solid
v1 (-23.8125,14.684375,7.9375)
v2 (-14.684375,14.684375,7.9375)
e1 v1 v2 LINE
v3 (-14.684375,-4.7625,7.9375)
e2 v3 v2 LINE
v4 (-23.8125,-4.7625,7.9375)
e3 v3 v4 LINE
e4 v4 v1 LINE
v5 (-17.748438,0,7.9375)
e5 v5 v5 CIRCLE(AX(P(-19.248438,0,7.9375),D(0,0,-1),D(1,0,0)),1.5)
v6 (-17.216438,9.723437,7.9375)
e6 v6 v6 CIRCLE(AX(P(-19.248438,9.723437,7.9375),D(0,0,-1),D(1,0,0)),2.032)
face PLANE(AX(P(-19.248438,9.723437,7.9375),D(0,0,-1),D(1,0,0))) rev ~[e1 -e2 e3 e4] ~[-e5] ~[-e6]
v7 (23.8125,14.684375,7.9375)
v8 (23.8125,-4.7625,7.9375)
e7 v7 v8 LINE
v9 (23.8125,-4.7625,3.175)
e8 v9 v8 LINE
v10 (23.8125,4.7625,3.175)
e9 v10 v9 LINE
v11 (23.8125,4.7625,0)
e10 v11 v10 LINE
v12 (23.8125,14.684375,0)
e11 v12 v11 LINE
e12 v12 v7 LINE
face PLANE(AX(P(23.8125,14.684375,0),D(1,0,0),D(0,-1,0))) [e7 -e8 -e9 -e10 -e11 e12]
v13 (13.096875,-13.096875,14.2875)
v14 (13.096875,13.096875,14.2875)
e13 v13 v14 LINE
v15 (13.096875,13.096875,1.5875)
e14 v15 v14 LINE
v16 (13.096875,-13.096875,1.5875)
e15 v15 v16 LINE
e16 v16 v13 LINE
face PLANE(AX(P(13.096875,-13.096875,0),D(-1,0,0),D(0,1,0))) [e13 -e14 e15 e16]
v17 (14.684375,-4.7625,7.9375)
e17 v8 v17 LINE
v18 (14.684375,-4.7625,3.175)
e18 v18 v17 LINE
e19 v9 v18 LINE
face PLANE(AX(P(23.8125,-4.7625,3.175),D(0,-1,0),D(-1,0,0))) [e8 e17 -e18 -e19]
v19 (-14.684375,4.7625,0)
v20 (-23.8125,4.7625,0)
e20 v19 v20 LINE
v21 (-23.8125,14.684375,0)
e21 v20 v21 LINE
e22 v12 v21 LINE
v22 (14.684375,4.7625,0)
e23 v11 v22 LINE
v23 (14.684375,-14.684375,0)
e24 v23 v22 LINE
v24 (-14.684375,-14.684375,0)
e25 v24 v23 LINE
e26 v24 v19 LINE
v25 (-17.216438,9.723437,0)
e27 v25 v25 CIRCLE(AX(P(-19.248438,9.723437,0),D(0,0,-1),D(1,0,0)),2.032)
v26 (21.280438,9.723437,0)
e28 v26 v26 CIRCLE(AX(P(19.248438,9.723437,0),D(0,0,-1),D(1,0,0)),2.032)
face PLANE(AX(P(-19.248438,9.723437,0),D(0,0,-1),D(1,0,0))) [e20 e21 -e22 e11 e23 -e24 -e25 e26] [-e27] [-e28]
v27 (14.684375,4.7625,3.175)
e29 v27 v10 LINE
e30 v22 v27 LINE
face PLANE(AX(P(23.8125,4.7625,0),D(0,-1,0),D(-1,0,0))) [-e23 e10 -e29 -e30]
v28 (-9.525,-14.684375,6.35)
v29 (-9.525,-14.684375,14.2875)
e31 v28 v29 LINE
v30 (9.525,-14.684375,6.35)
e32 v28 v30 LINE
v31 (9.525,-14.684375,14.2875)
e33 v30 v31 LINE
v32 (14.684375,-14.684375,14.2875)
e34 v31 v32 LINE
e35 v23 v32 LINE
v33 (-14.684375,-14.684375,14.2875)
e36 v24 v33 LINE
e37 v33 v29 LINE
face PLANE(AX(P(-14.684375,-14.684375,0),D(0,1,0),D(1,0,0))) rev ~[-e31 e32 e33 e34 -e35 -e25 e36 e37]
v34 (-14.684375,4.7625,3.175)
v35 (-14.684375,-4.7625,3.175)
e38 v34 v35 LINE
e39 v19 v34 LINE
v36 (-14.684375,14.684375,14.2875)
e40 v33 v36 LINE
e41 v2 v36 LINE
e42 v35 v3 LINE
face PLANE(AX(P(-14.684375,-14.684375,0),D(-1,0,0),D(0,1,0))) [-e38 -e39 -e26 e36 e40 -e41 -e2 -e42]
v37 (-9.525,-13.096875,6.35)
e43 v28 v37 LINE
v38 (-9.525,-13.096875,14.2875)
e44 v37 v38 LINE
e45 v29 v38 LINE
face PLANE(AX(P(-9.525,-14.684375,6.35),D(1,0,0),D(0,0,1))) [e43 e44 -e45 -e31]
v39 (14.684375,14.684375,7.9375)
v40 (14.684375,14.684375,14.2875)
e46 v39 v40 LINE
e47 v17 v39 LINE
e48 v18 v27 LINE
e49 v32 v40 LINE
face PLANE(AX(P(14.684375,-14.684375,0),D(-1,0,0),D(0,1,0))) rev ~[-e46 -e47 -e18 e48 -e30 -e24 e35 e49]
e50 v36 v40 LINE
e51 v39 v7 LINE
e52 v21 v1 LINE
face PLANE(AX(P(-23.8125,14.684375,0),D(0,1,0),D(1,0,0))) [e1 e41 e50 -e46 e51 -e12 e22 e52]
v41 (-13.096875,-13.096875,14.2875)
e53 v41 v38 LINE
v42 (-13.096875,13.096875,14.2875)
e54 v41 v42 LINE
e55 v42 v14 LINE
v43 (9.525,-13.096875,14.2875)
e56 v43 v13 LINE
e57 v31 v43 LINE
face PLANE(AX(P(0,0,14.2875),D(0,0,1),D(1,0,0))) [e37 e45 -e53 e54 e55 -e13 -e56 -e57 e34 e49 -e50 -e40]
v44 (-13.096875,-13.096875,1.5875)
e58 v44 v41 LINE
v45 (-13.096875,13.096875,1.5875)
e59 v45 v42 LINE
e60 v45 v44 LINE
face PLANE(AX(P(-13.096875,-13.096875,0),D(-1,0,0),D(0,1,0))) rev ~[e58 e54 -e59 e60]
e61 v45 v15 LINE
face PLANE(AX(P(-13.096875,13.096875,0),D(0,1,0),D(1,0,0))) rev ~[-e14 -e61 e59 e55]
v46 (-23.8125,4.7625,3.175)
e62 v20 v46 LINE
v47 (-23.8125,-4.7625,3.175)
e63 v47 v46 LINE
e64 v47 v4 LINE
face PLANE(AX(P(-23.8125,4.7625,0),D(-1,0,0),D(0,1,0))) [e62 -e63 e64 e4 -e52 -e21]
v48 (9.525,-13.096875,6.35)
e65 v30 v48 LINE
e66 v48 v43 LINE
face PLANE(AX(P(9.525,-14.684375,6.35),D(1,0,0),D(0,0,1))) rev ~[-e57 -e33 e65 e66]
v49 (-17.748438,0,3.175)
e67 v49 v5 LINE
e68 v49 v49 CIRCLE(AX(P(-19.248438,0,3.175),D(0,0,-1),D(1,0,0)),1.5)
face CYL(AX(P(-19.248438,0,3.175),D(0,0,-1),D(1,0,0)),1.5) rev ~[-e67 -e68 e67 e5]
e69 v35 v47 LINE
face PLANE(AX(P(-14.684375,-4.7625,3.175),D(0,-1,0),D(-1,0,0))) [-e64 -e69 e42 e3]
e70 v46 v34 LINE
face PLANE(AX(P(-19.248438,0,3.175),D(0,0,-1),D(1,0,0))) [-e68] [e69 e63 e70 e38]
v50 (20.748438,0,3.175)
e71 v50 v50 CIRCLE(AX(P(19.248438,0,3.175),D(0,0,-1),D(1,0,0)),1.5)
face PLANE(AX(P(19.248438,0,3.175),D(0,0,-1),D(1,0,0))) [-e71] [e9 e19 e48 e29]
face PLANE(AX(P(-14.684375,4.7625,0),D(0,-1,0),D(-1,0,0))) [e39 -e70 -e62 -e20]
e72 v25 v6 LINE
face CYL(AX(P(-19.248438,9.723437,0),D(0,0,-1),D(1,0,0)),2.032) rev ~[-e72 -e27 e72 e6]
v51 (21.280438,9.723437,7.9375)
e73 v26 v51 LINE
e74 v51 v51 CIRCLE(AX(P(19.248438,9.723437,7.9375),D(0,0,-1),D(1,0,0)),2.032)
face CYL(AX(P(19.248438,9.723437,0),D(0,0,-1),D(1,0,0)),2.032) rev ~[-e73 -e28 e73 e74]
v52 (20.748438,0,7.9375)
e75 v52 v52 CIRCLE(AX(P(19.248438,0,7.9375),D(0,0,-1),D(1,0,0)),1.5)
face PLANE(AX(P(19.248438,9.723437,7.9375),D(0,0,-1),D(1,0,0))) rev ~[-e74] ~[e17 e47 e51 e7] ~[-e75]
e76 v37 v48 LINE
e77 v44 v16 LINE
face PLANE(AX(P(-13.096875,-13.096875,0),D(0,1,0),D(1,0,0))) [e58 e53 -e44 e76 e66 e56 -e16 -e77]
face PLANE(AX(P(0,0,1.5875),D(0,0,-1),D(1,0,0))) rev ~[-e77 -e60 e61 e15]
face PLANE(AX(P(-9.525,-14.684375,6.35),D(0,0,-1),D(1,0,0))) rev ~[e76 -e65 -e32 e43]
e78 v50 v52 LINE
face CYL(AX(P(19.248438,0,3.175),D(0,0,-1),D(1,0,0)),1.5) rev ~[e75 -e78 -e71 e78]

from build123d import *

# Parameters (mm, degrees)
F0_W      = 29.36875
F0_H      = 29.36875
F0_W_2    = 26.19375
F0_H_2    = 26.19375
F1_DEPTH  = 14.2875
F2_W      = 26.19375
F2_H      = 26.19375
F3_DEPTH  = 1.5875
F7_W      = 19.05
F7_H      = 7.9375
F8_DEPTH  = 1.5875
F9_R      = 1.5
F10_DEPTH = 4.7625
F11_R     = 2.032
F12_DEPTH = 7.9375


with BuildPart() as f1:
    # F0 (on Top) → F1 (new body)
    with BuildSketch(Plane.XY):
        Rectangle(F0_W, F0_H)
        Rectangle(F0_W_2, F0_H_2, mode=Mode.SUBTRACT)
    extrude(amount=F1_DEPTH)

    # F2 (on face) → F3 (join)
    with BuildSketch(Plane(origin=(0, 0, 0), x_dir=(1, 0, 0), z_dir=(0, 0, -1))):
        Rectangle(F2_W, F2_H)
    extrude(amount=-F3_DEPTH)

    # F4: union 

    # F7 (on face) → F8 (cut, through all)
    with BuildSketch(Plane.XZ.offset(14.684375)):
        with Locations((0, 10.31875)):
            Rectangle(F7_W, F7_H)
    extrude(amount=-F8_DEPTH, mode=Mode.SUBTRACT)

    # F9 (on face) → F10 (join)
    with BuildSketch(Plane(origin=(0, 0, 3.175), x_dir=(1, 0, 0), z_dir=(0, 0, -1))):
        Polygon((23.8125, 4.7625), (19.2484375, 4.7625), (14.684375, 4.7625), (14.684375, -4.7625), (19.2484375, -4.7625), (23.8125, -4.7625), align=None)
        with Locations((19.2484375, 0)):
            Circle(F9_R, mode=Mode.SUBTRACT)
        Polygon((-19.2484375, -4.7625), (-14.684375, -4.7625), (-14.684375, 4.7625), (-19.2484375, 4.7625), (-23.8125, 4.7625), (-23.8125, -4.7625), align=None)
        with Locations((-19.2484375, 0)):
            Circle(F9_R, mode=Mode.SUBTRACT)
    extrude(amount=-F10_DEPTH)

    # F11 (on face) → F12 (join, through all)
    with BuildSketch(Plane(origin=(0, 0, 0), x_dir=(1, 0, 0), z_dir=(0, 0, -1))):
        Polygon((-23.8125, -14.684375), (-19.2484375, -14.684375), (-14.684375, -14.684375), (-14.684375, -4.7625), (-19.2484375, -4.7625), (-23.8125, -4.7625), align=None)
        with Locations((-19.2484375, -9.7234375)):
            Circle(F11_R, mode=Mode.SUBTRACT)
        Polygon((14.684375, -14.684375), (19.2484375, -14.684375), (23.8125, -14.684375), (23.8125, -4.7625), (19.2484375, -4.7625), (14.684375, -4.7625), align=None)
        with Locations((19.2484375, -9.7234375)):
            Circle(F11_R, mode=Mode.SUBTRACT)
    extrude(amount=-F12_DEPTH)


solid = f1.part
